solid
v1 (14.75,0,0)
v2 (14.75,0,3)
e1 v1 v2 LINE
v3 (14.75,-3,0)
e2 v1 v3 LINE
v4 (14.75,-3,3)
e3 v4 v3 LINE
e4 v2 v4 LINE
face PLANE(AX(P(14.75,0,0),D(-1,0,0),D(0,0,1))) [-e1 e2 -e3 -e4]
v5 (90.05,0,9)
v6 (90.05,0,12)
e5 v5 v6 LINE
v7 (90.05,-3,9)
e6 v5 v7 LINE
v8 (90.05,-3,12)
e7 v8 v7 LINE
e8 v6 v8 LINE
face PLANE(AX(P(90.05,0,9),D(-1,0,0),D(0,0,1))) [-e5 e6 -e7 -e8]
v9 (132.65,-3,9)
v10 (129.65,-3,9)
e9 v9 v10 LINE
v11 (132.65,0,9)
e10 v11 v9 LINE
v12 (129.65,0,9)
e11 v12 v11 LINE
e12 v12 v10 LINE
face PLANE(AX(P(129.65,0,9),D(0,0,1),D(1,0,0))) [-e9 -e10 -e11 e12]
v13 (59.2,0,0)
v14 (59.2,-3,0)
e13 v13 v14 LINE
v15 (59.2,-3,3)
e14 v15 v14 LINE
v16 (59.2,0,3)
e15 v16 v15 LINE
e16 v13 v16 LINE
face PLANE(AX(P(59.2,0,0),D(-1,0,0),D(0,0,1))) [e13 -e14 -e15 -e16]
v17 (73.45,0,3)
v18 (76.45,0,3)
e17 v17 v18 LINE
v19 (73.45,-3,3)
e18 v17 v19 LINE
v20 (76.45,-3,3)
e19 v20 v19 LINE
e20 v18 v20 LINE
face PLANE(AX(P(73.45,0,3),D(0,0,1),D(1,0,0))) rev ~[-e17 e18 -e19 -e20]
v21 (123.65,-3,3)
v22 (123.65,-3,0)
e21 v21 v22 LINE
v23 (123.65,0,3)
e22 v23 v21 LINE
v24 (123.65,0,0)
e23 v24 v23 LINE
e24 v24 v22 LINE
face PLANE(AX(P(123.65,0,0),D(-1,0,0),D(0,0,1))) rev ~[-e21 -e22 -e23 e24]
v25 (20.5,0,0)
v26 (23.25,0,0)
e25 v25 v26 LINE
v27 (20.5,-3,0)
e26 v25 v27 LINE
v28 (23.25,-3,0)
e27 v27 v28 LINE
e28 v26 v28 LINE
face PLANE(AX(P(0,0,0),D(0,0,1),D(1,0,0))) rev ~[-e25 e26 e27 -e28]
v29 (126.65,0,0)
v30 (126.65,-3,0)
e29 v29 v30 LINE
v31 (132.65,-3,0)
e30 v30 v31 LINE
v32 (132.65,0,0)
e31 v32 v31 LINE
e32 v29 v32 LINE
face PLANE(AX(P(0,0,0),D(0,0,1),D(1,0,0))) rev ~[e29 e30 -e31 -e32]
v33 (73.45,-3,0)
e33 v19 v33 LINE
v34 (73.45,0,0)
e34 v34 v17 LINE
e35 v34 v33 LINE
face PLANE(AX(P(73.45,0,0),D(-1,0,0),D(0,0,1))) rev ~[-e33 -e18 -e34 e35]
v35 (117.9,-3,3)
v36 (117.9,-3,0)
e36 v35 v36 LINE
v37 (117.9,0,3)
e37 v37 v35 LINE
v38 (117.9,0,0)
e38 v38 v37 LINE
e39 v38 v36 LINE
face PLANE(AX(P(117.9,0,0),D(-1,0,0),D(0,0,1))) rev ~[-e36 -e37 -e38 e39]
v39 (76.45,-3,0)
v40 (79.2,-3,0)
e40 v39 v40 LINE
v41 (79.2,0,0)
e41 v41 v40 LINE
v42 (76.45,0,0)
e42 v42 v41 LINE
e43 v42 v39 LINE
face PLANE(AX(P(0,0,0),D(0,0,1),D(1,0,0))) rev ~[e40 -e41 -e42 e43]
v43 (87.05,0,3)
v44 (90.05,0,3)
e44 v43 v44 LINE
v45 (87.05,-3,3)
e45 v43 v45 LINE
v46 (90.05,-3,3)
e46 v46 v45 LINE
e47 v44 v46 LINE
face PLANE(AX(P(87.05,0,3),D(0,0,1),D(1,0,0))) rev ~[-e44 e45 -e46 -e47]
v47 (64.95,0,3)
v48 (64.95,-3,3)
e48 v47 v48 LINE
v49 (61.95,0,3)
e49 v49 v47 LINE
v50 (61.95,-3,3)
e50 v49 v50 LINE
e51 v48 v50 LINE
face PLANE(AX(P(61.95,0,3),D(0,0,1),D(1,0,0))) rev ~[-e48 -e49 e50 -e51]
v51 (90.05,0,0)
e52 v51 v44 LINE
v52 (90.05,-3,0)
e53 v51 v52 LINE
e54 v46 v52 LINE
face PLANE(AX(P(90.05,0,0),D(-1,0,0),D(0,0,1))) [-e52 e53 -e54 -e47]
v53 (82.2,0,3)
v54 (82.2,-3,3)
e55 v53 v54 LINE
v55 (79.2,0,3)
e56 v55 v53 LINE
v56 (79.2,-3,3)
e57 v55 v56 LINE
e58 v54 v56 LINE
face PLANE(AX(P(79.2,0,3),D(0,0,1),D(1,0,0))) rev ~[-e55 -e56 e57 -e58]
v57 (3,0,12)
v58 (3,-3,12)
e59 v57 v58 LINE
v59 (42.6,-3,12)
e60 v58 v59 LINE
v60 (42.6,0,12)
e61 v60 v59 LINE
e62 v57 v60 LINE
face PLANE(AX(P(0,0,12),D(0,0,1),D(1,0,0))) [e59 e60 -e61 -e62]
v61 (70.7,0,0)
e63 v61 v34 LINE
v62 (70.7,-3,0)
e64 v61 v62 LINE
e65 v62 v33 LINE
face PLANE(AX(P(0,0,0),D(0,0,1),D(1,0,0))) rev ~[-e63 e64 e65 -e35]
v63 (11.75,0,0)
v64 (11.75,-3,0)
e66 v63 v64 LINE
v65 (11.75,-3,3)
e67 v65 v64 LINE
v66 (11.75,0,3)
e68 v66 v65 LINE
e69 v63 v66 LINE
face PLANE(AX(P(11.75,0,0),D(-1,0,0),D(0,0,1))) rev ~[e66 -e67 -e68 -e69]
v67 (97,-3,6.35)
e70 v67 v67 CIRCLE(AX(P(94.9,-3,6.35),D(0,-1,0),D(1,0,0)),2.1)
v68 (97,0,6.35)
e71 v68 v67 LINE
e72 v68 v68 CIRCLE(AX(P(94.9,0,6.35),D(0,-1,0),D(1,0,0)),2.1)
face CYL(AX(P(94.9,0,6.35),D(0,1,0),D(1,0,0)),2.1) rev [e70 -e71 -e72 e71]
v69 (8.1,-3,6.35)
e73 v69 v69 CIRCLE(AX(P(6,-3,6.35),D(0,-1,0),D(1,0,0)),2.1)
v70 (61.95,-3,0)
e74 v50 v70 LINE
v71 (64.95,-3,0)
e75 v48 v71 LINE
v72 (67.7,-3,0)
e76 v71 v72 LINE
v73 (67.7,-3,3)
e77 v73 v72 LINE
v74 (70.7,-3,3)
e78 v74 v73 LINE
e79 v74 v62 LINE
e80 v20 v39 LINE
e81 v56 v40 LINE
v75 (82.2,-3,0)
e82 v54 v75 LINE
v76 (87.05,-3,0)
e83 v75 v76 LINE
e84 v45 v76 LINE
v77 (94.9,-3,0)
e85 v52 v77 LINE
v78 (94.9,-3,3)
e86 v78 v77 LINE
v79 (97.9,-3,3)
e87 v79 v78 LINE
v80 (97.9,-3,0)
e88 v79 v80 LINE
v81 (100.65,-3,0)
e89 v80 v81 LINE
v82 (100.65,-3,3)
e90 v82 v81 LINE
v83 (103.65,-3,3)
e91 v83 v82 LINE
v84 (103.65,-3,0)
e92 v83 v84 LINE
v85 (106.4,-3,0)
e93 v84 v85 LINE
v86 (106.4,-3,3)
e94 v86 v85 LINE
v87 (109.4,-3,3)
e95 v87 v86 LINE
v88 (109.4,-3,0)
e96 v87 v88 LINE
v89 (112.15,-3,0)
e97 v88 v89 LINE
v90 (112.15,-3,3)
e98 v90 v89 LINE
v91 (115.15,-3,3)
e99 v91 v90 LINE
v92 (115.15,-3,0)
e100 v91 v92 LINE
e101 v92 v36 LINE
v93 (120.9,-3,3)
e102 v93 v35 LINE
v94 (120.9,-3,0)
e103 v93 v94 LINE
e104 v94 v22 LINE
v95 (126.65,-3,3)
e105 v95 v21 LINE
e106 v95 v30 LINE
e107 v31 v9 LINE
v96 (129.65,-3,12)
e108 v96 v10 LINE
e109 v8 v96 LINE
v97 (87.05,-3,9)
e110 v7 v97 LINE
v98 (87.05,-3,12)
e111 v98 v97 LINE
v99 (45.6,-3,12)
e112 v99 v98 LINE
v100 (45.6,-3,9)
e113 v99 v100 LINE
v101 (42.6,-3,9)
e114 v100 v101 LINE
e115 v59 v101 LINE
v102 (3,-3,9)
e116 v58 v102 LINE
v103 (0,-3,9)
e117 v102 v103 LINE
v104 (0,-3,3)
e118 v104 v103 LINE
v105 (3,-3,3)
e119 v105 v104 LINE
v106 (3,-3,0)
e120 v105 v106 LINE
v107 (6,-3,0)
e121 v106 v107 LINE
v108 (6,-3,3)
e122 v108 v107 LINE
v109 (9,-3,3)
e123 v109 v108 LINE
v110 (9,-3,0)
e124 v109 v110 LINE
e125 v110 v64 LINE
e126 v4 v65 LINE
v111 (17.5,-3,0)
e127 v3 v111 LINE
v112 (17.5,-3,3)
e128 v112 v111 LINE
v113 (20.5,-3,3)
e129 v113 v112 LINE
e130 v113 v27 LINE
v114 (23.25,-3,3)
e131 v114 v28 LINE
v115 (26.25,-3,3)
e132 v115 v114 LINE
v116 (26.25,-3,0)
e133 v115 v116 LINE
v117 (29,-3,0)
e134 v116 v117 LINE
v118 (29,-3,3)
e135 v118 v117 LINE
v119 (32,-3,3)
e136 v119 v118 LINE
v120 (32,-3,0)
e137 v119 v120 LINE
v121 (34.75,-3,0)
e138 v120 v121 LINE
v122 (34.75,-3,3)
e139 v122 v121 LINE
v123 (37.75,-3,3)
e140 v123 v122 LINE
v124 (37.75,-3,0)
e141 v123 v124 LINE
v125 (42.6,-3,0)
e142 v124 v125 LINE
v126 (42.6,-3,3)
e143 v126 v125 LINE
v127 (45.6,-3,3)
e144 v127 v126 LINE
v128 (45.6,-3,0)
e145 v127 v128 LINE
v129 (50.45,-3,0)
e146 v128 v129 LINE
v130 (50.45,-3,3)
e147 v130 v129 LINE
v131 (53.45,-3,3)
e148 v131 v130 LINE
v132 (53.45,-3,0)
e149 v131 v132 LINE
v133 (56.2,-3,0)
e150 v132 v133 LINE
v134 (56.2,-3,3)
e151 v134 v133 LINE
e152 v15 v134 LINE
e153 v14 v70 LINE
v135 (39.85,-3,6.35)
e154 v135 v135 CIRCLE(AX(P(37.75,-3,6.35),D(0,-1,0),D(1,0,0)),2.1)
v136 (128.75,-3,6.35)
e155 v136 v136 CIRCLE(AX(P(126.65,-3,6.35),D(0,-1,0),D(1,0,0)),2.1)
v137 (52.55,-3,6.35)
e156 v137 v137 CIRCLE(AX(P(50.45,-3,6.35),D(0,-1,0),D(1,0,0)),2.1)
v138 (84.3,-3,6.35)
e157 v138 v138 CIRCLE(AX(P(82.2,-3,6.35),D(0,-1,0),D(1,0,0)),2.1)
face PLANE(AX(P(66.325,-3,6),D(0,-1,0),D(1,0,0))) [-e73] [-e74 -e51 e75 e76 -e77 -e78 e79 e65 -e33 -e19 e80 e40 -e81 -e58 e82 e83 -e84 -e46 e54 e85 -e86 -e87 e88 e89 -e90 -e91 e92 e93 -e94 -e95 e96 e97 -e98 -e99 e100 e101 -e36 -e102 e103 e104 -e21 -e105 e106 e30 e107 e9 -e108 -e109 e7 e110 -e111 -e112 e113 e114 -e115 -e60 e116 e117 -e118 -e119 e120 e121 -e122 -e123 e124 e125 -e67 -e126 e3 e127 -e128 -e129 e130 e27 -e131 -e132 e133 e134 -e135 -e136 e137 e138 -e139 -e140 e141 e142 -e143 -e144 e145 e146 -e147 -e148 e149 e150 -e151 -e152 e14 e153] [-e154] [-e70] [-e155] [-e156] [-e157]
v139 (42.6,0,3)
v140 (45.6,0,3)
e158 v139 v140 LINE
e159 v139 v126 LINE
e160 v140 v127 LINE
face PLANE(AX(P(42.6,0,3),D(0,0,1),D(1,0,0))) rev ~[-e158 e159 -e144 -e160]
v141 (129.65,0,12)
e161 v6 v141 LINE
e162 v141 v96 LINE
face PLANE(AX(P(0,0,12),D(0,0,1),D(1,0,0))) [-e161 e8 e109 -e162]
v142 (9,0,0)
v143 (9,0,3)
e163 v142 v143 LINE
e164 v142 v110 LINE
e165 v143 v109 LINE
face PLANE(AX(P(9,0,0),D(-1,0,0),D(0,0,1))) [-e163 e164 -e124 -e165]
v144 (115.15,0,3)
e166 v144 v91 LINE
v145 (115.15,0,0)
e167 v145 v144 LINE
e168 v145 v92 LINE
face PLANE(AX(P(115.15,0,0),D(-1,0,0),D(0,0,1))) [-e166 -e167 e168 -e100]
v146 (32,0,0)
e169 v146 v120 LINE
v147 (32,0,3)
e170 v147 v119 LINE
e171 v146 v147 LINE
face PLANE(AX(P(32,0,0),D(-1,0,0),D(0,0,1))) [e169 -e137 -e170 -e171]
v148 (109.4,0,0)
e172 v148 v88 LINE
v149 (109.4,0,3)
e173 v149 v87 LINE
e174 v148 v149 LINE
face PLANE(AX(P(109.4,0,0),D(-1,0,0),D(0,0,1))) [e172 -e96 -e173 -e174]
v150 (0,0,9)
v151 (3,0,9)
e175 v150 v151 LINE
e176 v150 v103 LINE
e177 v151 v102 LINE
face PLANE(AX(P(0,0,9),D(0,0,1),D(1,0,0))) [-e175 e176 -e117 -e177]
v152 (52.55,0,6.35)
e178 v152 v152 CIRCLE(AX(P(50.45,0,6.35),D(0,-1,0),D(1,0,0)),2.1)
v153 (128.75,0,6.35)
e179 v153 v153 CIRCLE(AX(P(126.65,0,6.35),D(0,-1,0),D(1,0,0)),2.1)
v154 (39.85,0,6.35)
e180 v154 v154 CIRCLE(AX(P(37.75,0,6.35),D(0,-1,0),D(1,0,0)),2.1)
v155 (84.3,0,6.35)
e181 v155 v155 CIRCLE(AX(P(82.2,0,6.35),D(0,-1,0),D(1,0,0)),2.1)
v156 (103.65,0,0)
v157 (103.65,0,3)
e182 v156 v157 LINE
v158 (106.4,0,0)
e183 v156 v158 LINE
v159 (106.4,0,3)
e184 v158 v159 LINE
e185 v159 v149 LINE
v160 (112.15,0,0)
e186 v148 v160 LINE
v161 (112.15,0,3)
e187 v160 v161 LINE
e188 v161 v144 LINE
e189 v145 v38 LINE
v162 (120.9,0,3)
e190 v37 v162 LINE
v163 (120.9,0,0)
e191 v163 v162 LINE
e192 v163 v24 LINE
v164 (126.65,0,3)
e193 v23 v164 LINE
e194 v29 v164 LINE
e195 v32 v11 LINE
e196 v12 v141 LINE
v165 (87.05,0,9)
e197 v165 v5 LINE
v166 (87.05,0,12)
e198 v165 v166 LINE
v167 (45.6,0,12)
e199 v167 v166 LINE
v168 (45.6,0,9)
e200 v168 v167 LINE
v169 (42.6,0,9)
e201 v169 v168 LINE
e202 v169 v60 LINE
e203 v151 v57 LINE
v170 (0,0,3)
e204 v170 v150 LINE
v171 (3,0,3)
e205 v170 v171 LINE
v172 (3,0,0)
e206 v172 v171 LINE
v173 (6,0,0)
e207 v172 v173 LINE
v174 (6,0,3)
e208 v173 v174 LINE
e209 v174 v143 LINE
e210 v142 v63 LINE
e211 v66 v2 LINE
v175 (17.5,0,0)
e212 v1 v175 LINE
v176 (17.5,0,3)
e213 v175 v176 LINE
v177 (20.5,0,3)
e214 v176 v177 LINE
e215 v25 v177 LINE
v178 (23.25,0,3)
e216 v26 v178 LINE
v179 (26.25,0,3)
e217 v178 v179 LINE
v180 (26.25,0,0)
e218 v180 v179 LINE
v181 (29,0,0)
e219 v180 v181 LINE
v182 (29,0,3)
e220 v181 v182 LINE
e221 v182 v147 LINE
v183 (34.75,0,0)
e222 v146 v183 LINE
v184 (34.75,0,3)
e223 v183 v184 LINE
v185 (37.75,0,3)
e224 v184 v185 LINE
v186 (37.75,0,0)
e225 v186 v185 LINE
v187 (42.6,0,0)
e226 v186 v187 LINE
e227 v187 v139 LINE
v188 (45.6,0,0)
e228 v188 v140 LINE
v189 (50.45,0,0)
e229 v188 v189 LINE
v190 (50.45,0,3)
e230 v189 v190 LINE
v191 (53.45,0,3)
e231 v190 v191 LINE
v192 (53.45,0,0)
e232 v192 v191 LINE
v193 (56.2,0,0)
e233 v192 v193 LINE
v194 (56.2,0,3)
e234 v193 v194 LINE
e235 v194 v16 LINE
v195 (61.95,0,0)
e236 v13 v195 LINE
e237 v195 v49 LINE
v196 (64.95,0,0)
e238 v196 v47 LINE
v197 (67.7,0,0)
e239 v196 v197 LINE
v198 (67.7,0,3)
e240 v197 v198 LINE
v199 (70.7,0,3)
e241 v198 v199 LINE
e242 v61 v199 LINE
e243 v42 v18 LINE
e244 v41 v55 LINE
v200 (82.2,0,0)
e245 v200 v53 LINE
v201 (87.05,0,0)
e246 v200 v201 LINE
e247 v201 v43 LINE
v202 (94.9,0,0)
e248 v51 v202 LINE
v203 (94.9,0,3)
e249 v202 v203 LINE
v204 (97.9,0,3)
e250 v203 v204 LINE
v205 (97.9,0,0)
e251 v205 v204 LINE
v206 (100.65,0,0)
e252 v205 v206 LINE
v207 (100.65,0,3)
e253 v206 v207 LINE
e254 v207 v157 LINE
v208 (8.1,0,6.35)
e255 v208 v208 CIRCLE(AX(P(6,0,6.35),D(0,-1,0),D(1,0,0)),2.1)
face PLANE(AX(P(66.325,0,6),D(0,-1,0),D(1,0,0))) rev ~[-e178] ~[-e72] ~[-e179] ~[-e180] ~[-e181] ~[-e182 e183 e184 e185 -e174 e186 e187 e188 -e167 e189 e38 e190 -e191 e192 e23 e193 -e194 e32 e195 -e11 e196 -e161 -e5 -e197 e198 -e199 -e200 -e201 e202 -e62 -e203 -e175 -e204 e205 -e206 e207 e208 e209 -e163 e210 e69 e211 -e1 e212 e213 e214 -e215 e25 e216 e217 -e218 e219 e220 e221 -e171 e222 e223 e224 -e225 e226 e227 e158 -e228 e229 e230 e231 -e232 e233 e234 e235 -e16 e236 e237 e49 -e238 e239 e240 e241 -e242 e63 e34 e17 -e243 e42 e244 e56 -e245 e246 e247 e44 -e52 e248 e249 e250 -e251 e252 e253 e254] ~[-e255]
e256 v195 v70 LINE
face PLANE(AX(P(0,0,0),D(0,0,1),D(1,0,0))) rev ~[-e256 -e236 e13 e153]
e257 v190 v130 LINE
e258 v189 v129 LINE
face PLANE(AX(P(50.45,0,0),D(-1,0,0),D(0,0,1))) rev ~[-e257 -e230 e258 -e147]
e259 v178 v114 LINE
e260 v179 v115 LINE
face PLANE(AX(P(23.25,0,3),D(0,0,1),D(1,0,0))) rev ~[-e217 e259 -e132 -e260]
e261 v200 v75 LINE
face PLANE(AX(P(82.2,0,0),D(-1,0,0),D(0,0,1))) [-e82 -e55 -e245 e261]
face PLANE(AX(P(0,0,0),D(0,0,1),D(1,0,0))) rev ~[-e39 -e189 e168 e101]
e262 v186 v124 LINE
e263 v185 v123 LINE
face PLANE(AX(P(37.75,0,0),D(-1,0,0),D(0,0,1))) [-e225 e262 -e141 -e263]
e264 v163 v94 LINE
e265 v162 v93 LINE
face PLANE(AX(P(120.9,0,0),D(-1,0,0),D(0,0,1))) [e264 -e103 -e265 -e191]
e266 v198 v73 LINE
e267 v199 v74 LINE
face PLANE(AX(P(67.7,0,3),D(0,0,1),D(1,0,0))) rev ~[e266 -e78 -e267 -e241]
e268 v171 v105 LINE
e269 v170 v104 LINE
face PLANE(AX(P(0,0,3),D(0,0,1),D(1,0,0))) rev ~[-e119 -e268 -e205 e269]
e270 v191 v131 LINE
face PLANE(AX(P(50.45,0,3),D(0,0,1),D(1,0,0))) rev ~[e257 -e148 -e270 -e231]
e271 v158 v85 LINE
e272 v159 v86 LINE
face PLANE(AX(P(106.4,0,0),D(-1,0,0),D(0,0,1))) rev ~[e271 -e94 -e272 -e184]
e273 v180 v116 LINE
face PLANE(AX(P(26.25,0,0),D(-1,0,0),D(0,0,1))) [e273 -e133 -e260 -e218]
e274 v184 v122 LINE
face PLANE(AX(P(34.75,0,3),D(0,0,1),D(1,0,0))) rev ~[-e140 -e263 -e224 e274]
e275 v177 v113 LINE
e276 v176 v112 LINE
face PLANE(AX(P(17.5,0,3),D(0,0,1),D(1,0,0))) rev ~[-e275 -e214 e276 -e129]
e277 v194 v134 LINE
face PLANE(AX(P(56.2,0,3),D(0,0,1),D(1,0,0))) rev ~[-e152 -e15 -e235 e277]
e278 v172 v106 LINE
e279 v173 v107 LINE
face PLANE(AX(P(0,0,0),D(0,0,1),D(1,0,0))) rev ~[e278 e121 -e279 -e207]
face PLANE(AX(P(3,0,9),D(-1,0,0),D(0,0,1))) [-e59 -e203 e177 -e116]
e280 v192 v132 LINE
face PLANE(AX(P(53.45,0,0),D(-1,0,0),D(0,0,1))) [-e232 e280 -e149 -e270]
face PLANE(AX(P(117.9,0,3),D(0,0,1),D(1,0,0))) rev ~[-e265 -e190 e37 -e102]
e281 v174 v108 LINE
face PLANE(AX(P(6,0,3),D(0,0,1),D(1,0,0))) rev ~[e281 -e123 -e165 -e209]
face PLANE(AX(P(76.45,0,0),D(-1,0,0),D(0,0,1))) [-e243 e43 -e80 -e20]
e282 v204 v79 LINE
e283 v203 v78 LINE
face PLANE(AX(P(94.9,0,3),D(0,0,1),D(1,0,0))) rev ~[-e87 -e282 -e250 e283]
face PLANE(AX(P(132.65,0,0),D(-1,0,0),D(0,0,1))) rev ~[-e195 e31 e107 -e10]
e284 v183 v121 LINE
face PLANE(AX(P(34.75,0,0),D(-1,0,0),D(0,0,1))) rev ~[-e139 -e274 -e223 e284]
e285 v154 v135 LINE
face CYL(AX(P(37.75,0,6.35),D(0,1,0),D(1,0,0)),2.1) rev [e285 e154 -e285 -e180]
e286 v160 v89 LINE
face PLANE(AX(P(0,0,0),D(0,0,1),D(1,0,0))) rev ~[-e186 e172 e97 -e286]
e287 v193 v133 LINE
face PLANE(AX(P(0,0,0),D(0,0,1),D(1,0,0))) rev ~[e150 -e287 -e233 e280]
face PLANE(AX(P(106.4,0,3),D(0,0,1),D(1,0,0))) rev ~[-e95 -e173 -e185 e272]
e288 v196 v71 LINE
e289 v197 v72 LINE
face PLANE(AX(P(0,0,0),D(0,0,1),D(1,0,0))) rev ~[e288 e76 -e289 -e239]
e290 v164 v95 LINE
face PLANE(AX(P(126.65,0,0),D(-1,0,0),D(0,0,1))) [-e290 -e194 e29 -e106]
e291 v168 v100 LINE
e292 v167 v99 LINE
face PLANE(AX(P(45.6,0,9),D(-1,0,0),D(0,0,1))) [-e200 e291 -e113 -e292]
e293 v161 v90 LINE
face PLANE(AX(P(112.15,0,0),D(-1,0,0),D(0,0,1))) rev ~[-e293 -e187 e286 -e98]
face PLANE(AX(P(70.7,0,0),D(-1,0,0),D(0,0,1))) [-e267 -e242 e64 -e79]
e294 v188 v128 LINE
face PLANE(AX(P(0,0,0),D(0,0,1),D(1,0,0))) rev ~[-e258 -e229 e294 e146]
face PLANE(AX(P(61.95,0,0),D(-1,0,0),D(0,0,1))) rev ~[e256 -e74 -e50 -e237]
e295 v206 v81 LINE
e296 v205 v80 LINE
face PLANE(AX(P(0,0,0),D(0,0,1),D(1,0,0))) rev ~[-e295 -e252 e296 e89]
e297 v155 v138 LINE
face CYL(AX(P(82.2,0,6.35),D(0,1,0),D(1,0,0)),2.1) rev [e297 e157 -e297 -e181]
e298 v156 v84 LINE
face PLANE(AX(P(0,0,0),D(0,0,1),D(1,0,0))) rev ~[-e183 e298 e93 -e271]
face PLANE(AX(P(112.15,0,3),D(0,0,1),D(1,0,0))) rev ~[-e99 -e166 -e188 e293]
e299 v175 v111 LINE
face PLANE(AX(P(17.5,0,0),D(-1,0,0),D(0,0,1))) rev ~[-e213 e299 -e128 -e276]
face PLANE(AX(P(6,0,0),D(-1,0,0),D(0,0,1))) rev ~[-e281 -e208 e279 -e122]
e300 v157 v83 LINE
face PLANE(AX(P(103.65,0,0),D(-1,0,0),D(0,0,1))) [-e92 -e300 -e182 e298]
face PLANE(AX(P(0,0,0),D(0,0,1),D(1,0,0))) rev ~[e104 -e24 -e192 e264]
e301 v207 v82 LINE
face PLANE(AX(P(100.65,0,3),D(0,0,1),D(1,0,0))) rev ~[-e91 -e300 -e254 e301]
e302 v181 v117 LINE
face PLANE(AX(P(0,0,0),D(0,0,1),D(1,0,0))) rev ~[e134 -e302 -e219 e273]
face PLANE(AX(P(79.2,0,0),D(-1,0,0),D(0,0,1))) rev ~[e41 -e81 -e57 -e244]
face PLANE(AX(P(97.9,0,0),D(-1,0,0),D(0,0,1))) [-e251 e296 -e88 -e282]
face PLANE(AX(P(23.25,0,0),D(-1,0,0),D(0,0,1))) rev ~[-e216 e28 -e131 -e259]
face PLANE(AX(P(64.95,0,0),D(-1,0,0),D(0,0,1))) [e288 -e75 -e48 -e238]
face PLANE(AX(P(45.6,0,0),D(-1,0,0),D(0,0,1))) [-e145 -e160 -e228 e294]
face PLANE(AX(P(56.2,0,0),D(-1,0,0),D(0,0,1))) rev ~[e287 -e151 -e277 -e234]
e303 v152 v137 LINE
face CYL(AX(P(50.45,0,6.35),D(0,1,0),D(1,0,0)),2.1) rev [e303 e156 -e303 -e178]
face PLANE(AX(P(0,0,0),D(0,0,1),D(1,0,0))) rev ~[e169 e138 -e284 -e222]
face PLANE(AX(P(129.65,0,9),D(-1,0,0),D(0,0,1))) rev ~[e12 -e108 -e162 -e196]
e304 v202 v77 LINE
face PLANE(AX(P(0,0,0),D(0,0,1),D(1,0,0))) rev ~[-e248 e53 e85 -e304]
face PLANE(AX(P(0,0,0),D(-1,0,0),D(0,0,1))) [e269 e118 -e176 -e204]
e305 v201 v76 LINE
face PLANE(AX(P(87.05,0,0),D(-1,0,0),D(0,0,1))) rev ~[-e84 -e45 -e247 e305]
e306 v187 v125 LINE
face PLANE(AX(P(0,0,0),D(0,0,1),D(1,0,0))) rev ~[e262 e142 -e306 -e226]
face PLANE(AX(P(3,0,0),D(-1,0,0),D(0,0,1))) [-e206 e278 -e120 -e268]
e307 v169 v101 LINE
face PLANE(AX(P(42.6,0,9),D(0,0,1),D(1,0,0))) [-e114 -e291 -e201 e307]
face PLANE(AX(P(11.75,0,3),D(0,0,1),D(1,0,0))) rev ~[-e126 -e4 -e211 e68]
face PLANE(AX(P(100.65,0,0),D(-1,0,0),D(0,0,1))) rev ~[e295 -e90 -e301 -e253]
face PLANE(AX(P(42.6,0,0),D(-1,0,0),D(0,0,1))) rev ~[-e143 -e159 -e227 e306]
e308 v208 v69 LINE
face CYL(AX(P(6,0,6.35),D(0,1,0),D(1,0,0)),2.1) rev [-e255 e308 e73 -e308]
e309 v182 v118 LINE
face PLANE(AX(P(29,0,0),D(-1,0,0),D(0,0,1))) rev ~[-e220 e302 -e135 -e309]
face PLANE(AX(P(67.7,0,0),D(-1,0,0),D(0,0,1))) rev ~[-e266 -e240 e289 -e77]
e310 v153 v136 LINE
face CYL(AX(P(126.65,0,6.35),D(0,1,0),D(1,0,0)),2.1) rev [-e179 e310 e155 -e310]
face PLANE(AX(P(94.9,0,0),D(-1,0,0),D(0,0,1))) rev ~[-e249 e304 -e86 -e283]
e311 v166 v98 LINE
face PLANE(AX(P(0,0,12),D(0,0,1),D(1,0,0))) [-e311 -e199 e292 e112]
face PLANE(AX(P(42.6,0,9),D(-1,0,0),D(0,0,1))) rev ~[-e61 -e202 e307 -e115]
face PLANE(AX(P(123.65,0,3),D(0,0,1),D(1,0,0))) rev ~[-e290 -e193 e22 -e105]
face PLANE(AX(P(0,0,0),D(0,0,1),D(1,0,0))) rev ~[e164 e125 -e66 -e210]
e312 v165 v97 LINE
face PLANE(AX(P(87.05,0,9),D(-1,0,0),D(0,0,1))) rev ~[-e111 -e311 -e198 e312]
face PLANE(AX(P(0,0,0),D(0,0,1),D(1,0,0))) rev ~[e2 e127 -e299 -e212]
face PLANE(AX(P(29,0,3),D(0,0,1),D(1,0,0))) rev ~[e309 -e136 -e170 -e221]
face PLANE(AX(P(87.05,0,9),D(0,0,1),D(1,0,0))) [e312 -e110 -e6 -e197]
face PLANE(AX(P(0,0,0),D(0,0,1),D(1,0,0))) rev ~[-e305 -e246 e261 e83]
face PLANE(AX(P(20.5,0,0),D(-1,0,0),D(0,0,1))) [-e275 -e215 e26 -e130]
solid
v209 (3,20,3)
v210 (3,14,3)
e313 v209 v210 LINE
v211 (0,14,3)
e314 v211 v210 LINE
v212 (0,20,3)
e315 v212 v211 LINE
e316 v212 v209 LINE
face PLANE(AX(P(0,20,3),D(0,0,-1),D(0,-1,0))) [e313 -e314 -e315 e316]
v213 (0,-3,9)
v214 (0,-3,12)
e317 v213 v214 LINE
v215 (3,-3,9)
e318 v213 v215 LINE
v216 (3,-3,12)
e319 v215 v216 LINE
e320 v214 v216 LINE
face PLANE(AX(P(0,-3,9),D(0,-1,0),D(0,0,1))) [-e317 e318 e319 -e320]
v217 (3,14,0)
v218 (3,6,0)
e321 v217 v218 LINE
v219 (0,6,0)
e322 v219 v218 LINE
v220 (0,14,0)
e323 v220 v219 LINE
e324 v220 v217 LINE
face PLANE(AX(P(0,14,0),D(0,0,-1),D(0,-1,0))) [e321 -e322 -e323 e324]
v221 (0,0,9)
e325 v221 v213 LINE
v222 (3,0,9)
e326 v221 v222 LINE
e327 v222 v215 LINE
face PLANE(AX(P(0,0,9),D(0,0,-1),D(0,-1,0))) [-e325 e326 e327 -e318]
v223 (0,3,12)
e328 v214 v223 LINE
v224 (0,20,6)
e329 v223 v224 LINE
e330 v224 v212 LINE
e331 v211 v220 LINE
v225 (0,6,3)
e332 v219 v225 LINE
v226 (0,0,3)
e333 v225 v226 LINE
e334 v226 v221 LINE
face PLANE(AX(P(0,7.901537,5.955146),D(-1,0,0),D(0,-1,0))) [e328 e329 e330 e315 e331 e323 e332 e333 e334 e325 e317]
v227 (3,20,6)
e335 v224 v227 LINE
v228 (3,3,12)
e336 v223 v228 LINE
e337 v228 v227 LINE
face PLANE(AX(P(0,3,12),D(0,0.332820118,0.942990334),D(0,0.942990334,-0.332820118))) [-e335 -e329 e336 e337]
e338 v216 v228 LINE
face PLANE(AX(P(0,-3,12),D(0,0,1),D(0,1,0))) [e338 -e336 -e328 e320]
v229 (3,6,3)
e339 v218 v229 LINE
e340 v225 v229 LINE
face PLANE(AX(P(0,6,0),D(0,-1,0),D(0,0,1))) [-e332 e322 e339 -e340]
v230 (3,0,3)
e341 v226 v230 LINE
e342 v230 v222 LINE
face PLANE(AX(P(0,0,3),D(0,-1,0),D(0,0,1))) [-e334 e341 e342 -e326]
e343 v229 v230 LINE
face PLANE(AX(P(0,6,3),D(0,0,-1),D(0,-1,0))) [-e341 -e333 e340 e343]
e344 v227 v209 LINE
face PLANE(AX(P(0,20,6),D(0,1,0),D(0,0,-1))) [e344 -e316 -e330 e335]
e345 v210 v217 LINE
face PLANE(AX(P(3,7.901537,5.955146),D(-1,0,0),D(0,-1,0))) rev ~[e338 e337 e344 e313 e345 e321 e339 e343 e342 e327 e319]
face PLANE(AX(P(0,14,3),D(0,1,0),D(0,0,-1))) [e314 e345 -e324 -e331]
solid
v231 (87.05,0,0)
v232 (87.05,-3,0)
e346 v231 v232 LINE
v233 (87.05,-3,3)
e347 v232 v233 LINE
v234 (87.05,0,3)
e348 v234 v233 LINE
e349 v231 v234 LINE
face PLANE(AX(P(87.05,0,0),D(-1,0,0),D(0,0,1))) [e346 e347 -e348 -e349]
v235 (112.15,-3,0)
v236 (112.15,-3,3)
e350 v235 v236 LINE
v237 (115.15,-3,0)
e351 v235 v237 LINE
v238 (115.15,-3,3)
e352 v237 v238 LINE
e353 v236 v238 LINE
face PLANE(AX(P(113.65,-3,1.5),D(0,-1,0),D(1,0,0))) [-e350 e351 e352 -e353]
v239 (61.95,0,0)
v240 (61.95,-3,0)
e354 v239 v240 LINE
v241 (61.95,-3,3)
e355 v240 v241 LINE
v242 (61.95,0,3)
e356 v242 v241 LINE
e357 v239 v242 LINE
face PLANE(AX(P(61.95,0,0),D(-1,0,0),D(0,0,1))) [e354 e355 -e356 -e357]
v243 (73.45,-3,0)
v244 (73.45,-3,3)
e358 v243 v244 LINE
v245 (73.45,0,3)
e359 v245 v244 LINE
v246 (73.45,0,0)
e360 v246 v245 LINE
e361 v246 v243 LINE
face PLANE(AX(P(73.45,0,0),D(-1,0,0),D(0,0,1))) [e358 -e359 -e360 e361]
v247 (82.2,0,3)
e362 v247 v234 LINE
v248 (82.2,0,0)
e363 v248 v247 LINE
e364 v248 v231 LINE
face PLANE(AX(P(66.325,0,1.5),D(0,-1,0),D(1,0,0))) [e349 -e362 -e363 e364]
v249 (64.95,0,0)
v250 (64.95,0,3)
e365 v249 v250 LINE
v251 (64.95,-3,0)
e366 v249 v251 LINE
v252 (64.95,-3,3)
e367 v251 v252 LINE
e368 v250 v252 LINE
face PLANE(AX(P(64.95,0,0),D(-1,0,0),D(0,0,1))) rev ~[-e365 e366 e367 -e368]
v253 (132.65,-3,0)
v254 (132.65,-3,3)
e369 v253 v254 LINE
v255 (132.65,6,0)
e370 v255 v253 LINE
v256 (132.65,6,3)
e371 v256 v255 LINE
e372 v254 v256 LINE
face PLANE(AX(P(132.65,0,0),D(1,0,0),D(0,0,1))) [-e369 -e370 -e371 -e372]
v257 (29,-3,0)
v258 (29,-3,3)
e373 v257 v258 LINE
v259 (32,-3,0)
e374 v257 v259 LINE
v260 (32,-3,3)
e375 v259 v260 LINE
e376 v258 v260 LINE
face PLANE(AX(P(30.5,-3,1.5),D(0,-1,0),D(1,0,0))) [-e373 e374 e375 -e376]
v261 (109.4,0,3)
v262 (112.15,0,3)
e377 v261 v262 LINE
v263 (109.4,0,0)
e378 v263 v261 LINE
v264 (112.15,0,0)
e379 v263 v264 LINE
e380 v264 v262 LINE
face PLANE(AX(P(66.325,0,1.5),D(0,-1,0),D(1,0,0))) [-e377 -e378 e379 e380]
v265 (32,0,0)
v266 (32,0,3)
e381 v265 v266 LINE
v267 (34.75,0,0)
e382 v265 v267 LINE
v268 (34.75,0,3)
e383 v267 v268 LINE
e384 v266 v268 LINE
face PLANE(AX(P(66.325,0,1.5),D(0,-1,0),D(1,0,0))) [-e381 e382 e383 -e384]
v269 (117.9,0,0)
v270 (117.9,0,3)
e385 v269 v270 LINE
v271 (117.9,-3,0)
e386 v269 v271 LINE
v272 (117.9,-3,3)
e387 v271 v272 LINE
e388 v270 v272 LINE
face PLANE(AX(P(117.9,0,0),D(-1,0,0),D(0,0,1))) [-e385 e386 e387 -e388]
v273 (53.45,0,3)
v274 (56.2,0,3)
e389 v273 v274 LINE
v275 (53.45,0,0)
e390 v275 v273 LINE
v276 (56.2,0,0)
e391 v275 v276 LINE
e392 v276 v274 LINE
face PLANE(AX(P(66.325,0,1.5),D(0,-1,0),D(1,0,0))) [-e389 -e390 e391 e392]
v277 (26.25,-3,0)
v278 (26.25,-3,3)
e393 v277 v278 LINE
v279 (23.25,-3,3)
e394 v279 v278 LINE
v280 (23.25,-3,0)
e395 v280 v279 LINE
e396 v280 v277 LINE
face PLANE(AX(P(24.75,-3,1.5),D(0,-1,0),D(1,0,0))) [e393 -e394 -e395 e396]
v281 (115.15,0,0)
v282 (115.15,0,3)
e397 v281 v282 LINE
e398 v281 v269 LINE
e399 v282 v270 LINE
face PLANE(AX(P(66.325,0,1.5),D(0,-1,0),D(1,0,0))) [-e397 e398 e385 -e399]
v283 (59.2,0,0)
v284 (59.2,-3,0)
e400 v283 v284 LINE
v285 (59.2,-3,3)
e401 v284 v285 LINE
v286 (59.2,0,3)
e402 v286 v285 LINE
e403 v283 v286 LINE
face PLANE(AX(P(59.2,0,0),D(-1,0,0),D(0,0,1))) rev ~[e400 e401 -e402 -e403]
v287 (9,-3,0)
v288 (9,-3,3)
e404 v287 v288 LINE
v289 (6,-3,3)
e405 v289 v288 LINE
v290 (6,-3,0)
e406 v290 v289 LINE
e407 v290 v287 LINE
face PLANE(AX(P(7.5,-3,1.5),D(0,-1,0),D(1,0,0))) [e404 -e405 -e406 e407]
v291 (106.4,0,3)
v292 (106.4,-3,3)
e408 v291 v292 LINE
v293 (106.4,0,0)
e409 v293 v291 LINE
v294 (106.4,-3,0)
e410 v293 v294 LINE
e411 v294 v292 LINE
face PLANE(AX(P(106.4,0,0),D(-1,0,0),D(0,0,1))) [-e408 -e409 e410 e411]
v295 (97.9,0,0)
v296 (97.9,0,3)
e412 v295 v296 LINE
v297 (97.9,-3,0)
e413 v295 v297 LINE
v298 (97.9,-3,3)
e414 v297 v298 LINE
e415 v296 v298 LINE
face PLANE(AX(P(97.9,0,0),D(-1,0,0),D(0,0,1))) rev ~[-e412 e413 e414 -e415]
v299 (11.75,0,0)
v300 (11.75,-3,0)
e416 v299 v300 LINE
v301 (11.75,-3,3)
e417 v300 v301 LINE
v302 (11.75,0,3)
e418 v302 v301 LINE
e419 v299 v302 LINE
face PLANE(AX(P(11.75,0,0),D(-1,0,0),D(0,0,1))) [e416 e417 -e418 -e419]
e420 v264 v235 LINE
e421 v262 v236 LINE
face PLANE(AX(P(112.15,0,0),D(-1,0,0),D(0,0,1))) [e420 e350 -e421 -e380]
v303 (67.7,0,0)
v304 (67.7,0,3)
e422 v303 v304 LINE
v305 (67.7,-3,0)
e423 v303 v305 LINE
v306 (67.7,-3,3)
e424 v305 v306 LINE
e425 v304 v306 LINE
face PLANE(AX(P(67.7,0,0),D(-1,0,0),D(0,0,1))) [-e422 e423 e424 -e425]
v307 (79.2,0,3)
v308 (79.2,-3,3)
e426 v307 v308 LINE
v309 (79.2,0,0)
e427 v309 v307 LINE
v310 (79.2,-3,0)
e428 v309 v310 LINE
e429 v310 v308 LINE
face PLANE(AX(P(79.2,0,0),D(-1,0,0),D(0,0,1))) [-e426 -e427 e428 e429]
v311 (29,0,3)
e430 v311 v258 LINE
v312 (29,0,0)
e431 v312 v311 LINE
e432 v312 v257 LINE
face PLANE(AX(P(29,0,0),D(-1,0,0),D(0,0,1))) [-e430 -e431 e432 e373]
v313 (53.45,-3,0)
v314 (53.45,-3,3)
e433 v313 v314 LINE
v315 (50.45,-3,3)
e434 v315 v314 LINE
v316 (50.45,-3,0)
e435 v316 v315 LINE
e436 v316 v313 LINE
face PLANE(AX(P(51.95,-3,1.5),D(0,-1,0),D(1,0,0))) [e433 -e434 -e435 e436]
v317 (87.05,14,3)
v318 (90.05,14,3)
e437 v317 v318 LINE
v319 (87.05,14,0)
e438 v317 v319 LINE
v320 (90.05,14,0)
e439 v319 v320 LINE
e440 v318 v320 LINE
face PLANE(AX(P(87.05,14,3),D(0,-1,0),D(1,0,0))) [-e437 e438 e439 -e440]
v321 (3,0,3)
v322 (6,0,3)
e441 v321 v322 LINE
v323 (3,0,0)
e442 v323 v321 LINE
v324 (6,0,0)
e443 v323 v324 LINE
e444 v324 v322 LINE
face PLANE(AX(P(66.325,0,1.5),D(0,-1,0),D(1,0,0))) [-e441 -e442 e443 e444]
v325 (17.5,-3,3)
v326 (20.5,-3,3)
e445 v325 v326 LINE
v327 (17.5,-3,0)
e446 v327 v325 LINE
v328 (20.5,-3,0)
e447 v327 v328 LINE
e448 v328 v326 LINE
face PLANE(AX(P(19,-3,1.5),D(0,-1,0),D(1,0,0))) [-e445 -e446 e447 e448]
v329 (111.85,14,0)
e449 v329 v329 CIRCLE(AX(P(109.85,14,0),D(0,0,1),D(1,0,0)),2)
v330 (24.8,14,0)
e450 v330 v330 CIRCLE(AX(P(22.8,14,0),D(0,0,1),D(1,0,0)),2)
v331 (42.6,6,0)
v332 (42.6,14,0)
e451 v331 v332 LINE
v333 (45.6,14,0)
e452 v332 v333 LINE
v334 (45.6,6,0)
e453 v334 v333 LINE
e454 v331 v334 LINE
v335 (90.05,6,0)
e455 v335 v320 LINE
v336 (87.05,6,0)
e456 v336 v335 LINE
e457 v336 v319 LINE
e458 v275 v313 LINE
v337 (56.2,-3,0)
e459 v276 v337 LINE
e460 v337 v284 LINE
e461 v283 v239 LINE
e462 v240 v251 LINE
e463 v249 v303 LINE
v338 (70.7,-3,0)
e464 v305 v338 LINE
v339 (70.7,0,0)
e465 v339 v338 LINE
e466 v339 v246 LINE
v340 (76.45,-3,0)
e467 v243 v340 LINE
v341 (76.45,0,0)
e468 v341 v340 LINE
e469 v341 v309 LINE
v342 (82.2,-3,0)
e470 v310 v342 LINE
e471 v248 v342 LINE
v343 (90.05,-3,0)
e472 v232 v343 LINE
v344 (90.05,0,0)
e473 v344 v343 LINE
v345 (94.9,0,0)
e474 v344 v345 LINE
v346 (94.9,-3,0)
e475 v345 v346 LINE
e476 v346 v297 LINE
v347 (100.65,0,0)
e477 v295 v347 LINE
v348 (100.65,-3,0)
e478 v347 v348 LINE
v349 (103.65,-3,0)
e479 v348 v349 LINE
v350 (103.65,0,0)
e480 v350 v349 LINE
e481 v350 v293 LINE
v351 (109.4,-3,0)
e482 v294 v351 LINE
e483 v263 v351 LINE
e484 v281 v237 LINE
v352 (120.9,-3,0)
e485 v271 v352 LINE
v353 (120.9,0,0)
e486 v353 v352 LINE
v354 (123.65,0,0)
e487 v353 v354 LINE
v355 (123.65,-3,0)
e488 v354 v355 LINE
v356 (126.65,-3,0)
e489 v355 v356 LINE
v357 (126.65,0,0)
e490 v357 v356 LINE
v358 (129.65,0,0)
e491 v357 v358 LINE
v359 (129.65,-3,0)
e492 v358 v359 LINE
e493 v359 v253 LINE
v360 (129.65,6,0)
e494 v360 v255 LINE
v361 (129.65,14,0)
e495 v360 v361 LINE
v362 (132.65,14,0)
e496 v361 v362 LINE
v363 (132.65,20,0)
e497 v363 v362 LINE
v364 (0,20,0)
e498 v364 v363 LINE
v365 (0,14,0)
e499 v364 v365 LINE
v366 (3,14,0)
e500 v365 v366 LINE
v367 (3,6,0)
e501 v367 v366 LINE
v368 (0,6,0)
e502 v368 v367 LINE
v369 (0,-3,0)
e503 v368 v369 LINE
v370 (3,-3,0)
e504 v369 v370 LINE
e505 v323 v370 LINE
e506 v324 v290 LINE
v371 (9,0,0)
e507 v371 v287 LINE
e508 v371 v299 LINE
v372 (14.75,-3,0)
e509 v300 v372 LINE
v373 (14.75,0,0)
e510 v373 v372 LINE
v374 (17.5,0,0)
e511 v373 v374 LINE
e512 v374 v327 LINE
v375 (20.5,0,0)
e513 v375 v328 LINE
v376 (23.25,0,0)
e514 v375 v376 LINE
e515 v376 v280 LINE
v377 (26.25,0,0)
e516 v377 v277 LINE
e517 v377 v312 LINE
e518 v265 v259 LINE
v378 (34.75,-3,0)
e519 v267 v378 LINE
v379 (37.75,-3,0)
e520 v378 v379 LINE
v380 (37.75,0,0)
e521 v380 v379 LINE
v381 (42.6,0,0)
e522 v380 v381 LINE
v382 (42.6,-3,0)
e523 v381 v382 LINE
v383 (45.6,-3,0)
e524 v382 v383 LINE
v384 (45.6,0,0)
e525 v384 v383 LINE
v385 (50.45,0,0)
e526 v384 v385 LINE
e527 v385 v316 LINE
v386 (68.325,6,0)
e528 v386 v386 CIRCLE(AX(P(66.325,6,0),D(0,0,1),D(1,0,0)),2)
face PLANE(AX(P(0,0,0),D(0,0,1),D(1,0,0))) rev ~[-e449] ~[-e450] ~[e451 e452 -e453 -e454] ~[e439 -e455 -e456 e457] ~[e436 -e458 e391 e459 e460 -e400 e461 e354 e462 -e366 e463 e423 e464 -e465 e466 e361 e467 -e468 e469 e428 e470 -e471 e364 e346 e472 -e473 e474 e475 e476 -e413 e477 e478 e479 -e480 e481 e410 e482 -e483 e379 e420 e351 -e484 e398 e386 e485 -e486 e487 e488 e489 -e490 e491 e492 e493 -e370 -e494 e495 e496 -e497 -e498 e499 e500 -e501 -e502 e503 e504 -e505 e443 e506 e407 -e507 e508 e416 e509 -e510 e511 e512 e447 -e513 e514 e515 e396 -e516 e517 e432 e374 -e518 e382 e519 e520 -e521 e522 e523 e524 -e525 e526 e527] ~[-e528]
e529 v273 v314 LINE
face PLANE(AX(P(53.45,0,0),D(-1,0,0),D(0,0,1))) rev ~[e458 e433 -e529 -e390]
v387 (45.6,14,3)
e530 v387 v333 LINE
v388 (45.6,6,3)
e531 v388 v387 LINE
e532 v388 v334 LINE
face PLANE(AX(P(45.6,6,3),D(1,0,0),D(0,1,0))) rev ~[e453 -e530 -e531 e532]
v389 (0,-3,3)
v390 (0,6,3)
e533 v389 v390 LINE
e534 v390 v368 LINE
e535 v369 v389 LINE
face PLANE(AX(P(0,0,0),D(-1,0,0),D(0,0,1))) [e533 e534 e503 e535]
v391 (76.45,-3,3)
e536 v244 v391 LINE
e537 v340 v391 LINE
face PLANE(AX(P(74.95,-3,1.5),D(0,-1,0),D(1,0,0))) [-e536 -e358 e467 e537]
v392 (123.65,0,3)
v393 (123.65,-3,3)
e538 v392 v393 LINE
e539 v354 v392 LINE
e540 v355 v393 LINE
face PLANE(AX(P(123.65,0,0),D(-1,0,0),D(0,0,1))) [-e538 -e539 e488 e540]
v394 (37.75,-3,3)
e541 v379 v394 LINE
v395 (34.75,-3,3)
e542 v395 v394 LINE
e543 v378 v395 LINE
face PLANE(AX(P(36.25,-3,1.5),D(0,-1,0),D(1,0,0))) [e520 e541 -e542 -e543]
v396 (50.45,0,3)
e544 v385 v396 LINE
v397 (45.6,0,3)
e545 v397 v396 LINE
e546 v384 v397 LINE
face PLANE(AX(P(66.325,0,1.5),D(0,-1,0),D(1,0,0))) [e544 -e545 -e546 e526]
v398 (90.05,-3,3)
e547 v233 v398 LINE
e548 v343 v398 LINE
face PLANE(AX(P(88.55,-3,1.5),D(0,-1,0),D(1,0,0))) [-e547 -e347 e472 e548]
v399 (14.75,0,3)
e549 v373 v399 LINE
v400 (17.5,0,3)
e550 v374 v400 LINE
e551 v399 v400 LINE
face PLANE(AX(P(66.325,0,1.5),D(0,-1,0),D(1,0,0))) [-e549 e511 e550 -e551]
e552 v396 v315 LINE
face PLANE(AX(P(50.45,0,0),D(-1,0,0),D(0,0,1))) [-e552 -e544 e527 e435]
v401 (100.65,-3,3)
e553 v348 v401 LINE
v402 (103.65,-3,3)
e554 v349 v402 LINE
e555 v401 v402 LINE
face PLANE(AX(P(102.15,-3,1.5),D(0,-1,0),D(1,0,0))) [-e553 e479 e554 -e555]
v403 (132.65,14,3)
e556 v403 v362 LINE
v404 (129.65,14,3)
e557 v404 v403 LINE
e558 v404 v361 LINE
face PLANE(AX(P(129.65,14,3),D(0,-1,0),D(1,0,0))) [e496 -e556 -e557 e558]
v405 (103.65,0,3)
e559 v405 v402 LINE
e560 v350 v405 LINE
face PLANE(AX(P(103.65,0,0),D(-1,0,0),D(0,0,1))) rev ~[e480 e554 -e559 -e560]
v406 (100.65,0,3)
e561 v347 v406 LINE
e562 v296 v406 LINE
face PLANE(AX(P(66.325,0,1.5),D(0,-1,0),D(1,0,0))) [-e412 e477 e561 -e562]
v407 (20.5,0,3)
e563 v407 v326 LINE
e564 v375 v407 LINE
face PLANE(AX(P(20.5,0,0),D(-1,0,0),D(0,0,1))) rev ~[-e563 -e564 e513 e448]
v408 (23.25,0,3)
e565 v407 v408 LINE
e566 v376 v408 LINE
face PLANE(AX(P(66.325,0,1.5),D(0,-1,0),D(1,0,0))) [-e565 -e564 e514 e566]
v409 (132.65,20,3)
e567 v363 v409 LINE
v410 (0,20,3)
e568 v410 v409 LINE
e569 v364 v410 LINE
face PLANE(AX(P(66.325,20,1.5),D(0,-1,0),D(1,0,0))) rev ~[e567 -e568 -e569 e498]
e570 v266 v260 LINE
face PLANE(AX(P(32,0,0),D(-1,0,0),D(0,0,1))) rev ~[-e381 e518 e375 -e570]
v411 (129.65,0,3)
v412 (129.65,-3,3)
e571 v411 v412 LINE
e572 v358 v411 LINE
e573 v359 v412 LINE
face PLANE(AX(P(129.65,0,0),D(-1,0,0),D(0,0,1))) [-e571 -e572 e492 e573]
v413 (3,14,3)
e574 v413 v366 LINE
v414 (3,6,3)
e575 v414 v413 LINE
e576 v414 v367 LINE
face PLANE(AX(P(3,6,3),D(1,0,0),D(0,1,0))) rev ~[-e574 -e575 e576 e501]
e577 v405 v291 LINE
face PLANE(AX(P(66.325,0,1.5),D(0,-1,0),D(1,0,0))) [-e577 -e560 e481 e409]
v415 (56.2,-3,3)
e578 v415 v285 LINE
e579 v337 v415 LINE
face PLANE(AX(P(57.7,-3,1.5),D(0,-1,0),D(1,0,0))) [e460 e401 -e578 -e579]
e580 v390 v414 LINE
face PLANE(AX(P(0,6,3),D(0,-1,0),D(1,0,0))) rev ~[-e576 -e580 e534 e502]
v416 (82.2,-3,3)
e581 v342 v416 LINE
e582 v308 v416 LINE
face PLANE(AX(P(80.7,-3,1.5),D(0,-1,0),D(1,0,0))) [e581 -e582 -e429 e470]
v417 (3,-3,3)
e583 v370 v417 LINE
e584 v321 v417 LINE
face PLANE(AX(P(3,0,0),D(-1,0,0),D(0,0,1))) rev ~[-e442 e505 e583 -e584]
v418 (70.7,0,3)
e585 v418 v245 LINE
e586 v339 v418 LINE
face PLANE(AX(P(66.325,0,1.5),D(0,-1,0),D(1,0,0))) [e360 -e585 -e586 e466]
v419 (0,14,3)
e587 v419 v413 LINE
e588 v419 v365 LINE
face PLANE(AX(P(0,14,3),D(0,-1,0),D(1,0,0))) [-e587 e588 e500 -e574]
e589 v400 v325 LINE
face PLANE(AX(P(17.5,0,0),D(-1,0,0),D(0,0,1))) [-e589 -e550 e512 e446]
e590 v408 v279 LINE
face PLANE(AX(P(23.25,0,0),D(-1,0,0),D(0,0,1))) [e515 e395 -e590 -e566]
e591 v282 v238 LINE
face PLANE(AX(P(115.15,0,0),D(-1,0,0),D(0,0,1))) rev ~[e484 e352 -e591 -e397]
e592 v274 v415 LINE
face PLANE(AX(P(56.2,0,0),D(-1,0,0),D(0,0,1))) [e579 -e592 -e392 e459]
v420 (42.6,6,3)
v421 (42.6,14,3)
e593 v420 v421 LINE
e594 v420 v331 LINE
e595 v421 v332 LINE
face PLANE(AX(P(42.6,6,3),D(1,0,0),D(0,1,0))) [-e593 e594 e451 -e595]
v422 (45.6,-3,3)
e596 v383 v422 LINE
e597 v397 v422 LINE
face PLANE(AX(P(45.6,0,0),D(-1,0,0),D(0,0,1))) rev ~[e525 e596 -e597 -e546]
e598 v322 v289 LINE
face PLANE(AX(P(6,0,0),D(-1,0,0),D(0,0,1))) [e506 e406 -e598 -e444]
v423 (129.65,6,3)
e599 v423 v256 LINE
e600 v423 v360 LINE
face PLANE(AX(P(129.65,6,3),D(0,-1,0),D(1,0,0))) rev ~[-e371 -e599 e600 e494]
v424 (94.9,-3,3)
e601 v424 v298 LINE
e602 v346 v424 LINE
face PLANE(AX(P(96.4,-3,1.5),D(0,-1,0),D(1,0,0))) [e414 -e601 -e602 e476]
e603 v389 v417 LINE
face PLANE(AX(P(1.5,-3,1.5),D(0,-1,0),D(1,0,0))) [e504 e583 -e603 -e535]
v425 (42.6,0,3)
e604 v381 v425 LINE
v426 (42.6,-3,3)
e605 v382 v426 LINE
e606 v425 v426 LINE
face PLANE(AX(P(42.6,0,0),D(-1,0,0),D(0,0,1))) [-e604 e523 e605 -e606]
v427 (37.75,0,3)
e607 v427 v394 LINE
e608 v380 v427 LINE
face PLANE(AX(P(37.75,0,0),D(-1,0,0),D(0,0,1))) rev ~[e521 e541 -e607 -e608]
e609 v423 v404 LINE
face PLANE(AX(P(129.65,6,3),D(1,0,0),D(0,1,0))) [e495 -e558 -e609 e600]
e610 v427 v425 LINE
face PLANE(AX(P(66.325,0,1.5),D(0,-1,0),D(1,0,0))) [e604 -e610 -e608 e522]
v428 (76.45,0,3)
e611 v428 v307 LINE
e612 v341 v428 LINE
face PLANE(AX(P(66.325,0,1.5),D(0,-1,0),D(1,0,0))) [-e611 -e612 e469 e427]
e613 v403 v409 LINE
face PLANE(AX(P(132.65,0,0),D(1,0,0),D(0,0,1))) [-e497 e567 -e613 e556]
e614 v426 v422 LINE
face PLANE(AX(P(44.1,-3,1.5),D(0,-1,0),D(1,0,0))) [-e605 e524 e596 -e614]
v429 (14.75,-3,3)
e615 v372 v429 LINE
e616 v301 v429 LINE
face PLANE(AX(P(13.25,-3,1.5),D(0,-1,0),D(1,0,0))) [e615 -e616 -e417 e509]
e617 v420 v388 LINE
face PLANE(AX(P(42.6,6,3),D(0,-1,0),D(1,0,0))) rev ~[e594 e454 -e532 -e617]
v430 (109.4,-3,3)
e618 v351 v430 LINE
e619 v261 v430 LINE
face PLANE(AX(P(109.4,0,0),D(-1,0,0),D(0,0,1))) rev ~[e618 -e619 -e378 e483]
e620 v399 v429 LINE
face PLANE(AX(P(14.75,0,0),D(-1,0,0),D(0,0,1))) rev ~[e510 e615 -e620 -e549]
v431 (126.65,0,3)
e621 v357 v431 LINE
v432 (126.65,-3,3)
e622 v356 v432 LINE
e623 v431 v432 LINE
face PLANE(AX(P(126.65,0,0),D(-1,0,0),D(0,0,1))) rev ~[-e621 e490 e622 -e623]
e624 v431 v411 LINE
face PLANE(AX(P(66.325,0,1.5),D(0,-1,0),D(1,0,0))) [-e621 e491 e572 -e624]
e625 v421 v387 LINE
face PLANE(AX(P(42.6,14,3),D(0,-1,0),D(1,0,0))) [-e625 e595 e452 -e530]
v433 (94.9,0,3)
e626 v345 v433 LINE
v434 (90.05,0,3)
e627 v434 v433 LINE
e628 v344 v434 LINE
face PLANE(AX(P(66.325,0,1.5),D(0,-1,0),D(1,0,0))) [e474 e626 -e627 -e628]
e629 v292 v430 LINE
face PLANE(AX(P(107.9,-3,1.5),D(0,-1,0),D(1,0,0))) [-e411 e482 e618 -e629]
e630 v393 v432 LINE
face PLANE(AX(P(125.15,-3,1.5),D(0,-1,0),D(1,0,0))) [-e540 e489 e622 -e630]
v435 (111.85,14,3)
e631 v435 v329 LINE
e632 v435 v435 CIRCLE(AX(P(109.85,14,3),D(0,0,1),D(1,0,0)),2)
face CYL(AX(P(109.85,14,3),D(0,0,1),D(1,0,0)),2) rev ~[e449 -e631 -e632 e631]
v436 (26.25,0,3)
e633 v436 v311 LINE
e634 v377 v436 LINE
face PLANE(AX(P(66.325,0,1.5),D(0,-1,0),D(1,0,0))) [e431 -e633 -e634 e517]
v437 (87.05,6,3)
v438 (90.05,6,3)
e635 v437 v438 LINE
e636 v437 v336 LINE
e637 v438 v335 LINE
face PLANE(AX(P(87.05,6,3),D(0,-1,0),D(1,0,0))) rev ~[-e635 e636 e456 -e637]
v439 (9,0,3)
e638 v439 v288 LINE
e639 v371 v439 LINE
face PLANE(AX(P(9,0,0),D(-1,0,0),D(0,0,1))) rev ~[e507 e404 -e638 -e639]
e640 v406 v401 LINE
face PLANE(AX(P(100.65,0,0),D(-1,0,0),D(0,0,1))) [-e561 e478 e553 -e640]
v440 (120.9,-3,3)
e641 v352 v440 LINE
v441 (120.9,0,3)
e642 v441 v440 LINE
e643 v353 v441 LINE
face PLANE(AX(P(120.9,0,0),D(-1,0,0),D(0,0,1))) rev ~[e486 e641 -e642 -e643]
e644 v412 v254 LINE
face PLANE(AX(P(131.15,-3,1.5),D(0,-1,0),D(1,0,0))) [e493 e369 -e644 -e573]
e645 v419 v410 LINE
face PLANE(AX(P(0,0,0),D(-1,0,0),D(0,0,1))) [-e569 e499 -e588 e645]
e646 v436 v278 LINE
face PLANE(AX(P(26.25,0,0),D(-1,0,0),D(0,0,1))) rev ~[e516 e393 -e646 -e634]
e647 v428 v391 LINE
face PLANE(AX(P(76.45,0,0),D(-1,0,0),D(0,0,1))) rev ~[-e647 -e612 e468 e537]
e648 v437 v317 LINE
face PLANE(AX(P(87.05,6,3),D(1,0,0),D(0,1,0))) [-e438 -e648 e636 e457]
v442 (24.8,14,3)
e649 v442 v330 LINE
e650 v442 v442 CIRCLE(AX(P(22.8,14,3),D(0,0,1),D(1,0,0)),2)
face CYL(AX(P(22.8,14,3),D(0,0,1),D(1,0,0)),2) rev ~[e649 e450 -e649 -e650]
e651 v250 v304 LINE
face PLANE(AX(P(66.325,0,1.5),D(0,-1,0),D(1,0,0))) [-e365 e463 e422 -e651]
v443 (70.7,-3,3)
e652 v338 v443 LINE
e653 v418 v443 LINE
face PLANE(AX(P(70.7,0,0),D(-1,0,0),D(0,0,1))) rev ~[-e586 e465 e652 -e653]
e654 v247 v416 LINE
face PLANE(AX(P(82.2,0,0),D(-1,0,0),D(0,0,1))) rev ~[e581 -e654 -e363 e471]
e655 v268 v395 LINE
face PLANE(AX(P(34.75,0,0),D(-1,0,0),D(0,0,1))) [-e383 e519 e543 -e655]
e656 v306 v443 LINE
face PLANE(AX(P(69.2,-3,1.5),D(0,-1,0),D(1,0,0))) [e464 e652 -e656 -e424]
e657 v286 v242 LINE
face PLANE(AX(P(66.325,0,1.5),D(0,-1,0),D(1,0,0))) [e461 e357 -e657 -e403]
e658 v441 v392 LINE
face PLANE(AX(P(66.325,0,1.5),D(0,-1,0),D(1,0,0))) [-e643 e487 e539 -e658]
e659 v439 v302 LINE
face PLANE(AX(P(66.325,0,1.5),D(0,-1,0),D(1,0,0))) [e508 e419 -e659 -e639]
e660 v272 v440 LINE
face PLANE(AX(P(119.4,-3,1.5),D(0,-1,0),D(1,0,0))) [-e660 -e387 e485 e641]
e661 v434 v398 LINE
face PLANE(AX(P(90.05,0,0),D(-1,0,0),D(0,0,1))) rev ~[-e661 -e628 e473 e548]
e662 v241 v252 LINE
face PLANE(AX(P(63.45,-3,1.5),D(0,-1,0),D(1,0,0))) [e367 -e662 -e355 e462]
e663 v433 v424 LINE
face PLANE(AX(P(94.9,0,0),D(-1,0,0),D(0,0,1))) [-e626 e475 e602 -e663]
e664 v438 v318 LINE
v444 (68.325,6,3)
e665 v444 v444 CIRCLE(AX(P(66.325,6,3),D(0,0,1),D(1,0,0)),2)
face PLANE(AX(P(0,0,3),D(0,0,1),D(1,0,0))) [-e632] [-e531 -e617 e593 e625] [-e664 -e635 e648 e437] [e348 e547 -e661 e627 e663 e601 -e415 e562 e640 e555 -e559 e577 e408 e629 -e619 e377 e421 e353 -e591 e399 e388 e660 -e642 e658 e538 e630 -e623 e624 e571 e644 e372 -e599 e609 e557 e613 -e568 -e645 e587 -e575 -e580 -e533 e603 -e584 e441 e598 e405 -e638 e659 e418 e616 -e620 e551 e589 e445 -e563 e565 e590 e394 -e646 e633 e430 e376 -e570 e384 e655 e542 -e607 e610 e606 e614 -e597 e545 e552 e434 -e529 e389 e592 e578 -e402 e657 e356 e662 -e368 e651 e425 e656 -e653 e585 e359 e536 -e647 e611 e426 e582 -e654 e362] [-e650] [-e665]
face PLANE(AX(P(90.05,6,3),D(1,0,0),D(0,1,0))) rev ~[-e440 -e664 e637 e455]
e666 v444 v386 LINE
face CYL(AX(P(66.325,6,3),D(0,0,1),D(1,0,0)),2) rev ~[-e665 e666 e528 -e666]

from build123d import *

# Parameters (mm, degrees)
F0_W      = 132.65
F0_H      = 12
F0_R      = 2.1
F3_DEPTH  = 3
F1_W      = 3
F1_H      = 3
F4_DEPTH  = 3.001
F2_W      = 132.65
F2_H      = 3
F5_DEPTH  = 20
F6_DEPTH  = 3
F7_W      = 3
F7_H      = 8
F8_DEPTH  = 3.001
F9_W      = 3
F9_H      = 3
F10_DEPTH = 3.001
F11_R     = 2
F13_DEPTH = 3.001
F14_DEPTH = 3


# Not quite as in the source:
# - a feature names something its author has since deleted; it is built from what else it names


with BuildPart() as f3:
    # F0 (on Front) → F3 (new body)
    with BuildSketch(Plane.XZ):
        with Locations((66.325, 6)):
            Rectangle(F0_W, F0_H)
        with Locations((6, 6.35)):
            Circle(F0_R, mode=Mode.SUBTRACT)
        with Locations((37.75, 6.35)):
            Circle(F0_R, mode=Mode.SUBTRACT)
        with Locations((50.45, 6.35)):
            Circle(F0_R, mode=Mode.SUBTRACT)
        with Locations((82.2, 6.35)):
            Circle(F0_R, mode=Mode.SUBTRACT)
        with Locations((94.9, 6.35)):
            Circle(F0_R, mode=Mode.SUBTRACT)
        with Locations((126.65, 6.35)):
            Circle(F0_R, mode=Mode.SUBTRACT)
    extrude(amount=F3_DEPTH)

    # F1 (on face) → F4 (cut, through all)
    with BuildSketch(Plane.XZ):
        with Locations((1.5, 1.5)):
            Rectangle(F1_W, F1_H)
        with Locations((7.5, 1.5)):
            Rectangle(F1_W, F1_H)
        with Locations((13.25, 1.5)):
            Rectangle(F1_W, F1_H)
        with Locations((19, 1.5)):
            Rectangle(F1_W, F1_H)
        with Locations((24.75, 1.5)):
            Rectangle(F1_W, F1_H)
        with Locations((30.5, 1.5)):
            Rectangle(F1_W, F1_H)
        with Locations((36.25, 1.5)):
            Rectangle(F1_W, F1_H)
        with Locations((44.1, 1.5)):
            Rectangle(F1_W, F1_H)
        with Locations((51.95, 1.5)):
            Rectangle(F1_W, F1_H)
        with Locations((57.7, 1.5)):
            Rectangle(F1_W, F1_H)
        with Locations((63.45, 1.5)):
            Rectangle(F1_W, F1_H)
        with Locations((69.2, 1.5)):
            Rectangle(F1_W, F1_H)
        with Locations((74.95, 1.5)):
            Rectangle(F1_W, F1_H)
        with Locations((80.7, 1.5)):
            Rectangle(F1_W, F1_H)
        with Locations((88.55, 1.5)):
            Rectangle(F1_W, F1_H)
        with Locations((96.4, 1.5)):
            Rectangle(F1_W, F1_H)
        with Locations((102.15, 1.5)):
            Rectangle(F1_W, F1_H)
        with Locations((107.9, 1.5)):
            Rectangle(F1_W, F1_H)
        with Locations((113.65, 1.5)):
            Rectangle(F1_W, F1_H)
        with Locations((119.4, 1.5)):
            Rectangle(F1_W, F1_H)
        with Locations((125.15, 1.5)):
            Rectangle(F1_W, F1_H)
    extrude(amount=F4_DEPTH, mode=Mode.SUBTRACT)

    # F9 (on face) → F10 (cut, through all)
    with BuildSketch(Plane.XZ):
        with Locations((88.55, 10.5)):
            Rectangle(F9_W, F9_H)
        with Locations((131.15, 10.5)):
            Rectangle(F9_W, F9_H)
        with Locations((44.1, 10.5)):
            Rectangle(F9_W, F9_H)
        with Locations((1.5, 10.5)):
            Rectangle(F9_W, F9_H)
    extrude(amount=F10_DEPTH, mode=Mode.SUBTRACT)


with BuildPart() as f5:
    # F2 (on Front) → F5 (new body)
    with BuildSketch(Plane.XZ):
        with Locations((66.325, 1.5)):
            Rectangle(F2_W, F2_H)
    extrude(amount=-F5_DEPTH)

    # F1 (on face) → F6 (join)
    with BuildSketch(Plane.XZ):
        with Locations((125.15, 1.5)):
            Rectangle(F1_W, F1_H)
        with Locations((119.4, 1.5)):
            Rectangle(F1_W, F1_H)
        with Locations((113.65, 1.5)):
            Rectangle(F1_W, F1_H)
        with Locations((107.9, 1.5)):
            Rectangle(F1_W, F1_H)
        with Locations((102.15, 1.5)):
            Rectangle(F1_W, F1_H)
        with Locations((96.4, 1.5)):
            Rectangle(F1_W, F1_H)
        with Locations((88.55, 1.5)):
            Rectangle(F1_W, F1_H)
        with Locations((80.7, 1.5)):
            Rectangle(F1_W, F1_H)
        with Locations((74.95, 1.5)):
            Rectangle(F1_W, F1_H)
        with Locations((69.2, 1.5)):
            Rectangle(F1_W, F1_H)
        with Locations((63.45, 1.5)):
            Rectangle(F1_W, F1_H)
        with Locations((57.7, 1.5)):
            Rectangle(F1_W, F1_H)
        with Locations((51.95, 1.5)):
            Rectangle(F1_W, F1_H)
        with Locations((44.1, 1.5)):
            Rectangle(F1_W, F1_H)
        with Locations((36.25, 1.5)):
            Rectangle(F1_W, F1_H)
        with Locations((30.5, 1.5)):
            Rectangle(F1_W, F1_H)
        with Locations((24.75, 1.5)):
            Rectangle(F1_W, F1_H)
        with Locations((19, 1.5)):
            Rectangle(F1_W, F1_H)
        with Locations((13.25, 1.5)):
            Rectangle(F1_W, F1_H)
        with Locations((7.5, 1.5)):
            Rectangle(F1_W, F1_H)
        with Locations((1.5, 1.5)):
            Rectangle(F1_W, F1_H)
        with Locations((131.15, 1.5)):
            Rectangle(F1_W, F1_H)
    extrude(amount=F6_DEPTH)

    # F7 (on face) → F8 (cut, through all)
    with BuildSketch(Plane.XY.offset(3)):
        with Locations((131.15, 10)):
            Rectangle(F7_W, F7_H)
        with Locations((44.1, 10)):
            Rectangle(F7_W, F7_H)
        with Locations((1.5, 10)):
            Rectangle(F7_W, F7_H)
        with Locations((88.55, 10)):
            Rectangle(F7_W, F7_H)
    extrude(amount=-F8_DEPTH, mode=Mode.SUBTRACT)

    # F11 (on face) → F13 (cut, through all)
    with BuildSketch(Plane.XY.offset(3)):
        with Locations((66.325, 6)):
            Circle(F11_R)
        with Locations((109.85, 14)):
            Circle(F11_R)
        with Locations((22.8, 14)):
            Circle(F11_R)
    extrude(amount=-F13_DEPTH, mode=Mode.SUBTRACT)


with BuildPart() as f14:
    # F12 (on face) → F14 (new body)
    with BuildSketch(Plane(origin=(0, 0, 0), x_dir=(0, -1, 0), z_dir=(-1, 0, 0))):
        Polygon((-20, 6), (-20, 3), (-14, 3), (-14, 0), (-6, 0), (-6, 3), (0, 3), (0, 9), (3, 9), (3, 12), (-3, 12), align=None)
    extrude(amount=-F14_DEPTH)


solid = Compound([f3.part, f5.part, f14.part])
